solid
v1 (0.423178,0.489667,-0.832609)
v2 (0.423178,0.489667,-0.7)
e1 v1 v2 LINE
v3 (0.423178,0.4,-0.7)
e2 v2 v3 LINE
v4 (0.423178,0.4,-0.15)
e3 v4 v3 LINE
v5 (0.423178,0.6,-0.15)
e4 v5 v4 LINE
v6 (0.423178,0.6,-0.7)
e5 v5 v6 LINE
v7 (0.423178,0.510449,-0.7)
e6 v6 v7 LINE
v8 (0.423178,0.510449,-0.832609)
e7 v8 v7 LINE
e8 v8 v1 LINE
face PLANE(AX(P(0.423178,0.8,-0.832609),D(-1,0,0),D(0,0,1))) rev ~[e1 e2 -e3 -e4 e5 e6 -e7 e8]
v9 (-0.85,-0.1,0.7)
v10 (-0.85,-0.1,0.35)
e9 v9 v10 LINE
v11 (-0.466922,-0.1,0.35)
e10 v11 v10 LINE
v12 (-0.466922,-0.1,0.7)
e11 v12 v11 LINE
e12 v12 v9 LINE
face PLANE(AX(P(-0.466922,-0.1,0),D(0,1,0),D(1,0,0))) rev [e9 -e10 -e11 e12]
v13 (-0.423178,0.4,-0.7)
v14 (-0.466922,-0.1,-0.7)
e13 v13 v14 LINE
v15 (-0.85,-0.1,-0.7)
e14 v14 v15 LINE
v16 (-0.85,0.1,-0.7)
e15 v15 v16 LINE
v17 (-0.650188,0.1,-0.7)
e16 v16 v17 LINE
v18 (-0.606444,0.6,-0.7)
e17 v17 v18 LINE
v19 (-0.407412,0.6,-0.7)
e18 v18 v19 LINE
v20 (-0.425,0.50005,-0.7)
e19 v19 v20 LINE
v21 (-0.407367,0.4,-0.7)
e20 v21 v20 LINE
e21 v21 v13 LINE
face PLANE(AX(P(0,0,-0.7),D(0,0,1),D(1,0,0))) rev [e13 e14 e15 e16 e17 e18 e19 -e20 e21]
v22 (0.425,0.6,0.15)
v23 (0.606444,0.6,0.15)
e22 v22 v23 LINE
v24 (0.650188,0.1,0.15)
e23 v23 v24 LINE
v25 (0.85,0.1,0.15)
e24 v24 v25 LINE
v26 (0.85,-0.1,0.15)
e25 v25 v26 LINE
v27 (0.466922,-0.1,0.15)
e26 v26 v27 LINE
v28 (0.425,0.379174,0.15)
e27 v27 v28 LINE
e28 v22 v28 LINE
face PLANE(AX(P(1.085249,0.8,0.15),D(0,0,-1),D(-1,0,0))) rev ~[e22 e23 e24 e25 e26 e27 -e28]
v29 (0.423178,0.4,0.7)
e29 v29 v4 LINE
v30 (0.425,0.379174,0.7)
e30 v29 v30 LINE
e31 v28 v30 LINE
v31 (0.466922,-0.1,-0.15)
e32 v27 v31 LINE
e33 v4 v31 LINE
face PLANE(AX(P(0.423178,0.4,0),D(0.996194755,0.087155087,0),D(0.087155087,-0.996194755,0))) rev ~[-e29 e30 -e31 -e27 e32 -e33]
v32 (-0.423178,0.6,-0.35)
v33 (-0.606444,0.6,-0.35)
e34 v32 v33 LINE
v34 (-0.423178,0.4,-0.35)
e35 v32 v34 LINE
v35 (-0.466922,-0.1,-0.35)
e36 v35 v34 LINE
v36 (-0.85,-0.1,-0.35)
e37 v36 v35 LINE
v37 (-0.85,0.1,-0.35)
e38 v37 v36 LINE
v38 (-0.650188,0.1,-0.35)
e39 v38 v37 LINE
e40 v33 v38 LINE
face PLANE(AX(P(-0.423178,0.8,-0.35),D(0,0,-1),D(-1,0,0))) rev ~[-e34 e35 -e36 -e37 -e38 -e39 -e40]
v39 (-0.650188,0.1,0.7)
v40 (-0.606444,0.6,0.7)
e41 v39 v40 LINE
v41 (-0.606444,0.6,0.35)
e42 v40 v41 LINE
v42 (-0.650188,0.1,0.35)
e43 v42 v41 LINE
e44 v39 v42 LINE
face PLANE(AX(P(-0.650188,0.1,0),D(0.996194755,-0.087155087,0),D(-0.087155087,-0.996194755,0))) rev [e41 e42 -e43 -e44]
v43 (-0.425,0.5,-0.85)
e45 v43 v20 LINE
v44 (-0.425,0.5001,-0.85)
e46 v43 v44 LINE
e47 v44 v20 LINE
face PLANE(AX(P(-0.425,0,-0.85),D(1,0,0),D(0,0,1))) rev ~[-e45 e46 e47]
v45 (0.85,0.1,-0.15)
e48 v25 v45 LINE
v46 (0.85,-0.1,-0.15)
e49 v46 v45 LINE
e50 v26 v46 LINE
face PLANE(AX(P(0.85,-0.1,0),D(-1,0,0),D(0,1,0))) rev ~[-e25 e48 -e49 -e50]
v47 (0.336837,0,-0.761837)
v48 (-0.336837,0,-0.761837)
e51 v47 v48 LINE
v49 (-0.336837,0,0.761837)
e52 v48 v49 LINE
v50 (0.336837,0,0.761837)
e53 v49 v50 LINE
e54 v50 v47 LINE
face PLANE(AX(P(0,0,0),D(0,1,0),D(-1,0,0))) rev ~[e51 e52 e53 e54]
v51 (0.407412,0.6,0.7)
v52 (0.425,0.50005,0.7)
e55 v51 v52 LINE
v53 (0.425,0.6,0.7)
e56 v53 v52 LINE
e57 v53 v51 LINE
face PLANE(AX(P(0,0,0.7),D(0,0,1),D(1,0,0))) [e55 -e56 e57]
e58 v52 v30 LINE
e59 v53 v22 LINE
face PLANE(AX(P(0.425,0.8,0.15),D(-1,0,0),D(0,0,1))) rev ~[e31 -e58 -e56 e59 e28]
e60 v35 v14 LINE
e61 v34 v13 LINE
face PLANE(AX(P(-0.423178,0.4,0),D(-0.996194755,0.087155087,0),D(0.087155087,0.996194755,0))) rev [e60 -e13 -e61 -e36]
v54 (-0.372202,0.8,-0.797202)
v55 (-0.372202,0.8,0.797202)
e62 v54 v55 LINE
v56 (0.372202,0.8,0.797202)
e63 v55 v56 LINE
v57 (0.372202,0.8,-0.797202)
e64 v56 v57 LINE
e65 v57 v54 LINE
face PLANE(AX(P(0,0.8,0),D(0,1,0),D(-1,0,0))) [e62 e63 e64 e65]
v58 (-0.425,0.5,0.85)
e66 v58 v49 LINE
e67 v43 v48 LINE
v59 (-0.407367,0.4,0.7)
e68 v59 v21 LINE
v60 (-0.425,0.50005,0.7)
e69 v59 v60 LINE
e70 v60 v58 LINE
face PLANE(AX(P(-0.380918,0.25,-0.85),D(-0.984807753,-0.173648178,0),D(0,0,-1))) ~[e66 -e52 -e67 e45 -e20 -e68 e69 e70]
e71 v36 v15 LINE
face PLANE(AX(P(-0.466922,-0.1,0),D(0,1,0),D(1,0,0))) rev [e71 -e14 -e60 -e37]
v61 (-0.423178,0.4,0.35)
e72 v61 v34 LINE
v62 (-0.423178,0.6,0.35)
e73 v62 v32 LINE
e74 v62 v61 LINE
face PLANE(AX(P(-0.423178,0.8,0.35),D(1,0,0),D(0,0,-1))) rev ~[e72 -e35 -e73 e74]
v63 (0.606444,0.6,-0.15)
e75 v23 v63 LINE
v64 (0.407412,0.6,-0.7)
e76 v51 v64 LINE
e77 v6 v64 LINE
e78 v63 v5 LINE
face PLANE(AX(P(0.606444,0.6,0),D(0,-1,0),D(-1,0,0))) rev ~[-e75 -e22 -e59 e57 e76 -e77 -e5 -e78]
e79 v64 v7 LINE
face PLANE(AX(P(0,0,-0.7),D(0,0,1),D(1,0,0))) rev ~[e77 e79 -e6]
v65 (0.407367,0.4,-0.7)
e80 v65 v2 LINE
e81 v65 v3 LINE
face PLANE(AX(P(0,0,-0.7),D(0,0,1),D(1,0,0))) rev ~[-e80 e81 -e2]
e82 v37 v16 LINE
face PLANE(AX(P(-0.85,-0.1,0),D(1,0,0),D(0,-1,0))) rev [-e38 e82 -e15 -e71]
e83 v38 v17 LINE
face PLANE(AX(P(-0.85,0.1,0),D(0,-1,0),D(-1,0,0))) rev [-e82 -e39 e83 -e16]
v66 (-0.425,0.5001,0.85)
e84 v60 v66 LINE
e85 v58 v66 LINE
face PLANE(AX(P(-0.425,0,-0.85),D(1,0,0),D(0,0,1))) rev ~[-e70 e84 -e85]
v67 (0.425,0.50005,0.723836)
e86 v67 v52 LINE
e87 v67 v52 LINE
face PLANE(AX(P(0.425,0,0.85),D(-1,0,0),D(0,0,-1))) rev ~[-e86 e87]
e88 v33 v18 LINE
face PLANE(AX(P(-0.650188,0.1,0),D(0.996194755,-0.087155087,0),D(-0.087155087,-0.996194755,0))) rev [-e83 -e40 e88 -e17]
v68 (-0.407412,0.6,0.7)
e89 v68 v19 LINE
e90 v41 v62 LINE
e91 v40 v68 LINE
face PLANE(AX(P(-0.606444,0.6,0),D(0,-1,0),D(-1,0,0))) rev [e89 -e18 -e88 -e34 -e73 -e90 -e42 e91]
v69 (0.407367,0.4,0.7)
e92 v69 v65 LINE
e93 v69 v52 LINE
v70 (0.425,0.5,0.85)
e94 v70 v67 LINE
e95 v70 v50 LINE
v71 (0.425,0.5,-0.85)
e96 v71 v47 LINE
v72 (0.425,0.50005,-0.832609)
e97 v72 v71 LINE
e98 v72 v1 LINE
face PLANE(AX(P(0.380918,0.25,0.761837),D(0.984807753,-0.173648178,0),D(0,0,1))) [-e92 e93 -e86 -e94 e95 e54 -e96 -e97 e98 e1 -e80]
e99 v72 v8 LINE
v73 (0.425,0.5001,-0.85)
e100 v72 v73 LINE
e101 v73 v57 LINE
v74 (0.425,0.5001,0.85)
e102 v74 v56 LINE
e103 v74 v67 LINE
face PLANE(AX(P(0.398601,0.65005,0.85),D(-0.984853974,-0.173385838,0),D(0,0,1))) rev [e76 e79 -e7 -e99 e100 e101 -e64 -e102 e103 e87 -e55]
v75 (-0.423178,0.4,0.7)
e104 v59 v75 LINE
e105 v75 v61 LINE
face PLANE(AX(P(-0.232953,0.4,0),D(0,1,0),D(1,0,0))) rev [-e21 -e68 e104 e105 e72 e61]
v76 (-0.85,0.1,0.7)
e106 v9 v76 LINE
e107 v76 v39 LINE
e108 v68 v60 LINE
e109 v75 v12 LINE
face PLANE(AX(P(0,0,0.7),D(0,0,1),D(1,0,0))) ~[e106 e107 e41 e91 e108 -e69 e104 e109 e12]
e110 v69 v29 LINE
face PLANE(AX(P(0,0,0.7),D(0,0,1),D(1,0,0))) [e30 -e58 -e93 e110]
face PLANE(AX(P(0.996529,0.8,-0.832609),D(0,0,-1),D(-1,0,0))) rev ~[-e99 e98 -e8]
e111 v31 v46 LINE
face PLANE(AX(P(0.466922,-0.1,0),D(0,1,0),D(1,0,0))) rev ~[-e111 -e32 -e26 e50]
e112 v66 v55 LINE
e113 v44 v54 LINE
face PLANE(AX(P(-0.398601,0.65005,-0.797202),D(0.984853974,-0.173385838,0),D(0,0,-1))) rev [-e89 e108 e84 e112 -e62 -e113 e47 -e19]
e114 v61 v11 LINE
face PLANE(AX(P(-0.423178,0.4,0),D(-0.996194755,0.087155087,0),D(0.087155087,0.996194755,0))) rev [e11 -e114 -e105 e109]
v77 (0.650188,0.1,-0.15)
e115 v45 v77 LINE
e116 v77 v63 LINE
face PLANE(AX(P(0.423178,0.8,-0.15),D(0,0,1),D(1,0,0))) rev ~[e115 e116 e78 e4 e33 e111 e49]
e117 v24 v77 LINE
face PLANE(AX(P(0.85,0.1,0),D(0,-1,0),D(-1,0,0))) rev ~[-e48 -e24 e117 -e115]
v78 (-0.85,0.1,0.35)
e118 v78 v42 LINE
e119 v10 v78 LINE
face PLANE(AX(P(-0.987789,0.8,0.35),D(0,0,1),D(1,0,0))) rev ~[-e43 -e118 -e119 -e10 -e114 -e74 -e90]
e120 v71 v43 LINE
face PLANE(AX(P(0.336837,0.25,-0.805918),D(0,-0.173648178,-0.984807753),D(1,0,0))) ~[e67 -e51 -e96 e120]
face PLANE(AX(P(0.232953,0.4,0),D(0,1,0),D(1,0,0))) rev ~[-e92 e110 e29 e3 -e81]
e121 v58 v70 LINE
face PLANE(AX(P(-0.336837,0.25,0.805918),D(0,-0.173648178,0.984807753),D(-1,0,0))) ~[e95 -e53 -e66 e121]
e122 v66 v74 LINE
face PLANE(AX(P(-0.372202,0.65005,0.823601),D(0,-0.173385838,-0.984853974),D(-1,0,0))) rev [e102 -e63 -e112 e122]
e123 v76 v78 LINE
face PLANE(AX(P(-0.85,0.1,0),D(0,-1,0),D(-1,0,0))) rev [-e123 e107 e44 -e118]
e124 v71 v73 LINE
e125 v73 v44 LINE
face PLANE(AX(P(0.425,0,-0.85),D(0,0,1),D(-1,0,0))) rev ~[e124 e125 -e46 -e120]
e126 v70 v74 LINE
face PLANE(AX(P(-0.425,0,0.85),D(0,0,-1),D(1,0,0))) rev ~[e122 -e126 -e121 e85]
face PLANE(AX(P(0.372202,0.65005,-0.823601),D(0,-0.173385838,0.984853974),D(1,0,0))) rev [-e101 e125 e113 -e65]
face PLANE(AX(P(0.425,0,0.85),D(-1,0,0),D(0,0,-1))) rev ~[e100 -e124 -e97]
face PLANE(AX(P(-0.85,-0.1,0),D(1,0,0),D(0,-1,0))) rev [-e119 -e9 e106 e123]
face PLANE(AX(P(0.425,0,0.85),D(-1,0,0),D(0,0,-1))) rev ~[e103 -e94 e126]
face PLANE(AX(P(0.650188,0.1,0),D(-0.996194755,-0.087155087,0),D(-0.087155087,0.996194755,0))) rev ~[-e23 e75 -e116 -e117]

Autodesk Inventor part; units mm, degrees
ref_plane "YZ Plane" through (0, 0, 0) normal (1, 0, 0) x (0, 1, 0)
ref_plane "XZ Plane" through (0, 0, 0) normal (0, 1, 0) x (-1, 0, 0)
ref_plane "XY Plane" through (0, 0, 0) normal (0, 0, 1) x (1, 0, 0)
sketch "Sketch1" plane through (0, 0, 0) normal (0, 1, 0) x (-1, 0, 0)
  line L0 (0.425, 0.85) -> (-0.425, 0.85)
  line L1 (-0.425, 0.85) -> (-0.425, -0.85)
  line L2 (-0.425, -0.85) -> (0.425, -0.85)
  line L3 (0.425, -0.85) -> (0.425, 0.85)
  point P0 (0, 0)
  dimension "d0" = 1.7
  dimension "d1" = 0.85
  dimension "d2" = 0.85
  dimension "d3" = 0.425
extrude "Extrusion1" add sketch "Sketch1" along normal blind 0.8
chamfer "Chamfer1" distance 0.5 angle 10 1 edges at (-0.425, 0, 0) measured on face at (-0.425, 0.2667, -0.2833)
chamfer "Chamfer2" distance 0.5 angle 10 1 edges at (0.0441, 0, 0.85) measured on face at (0.1417, 0.4333, 0.85)
chamfer "Chamfer3" distance 0.5 angle 10 1 edges at (0.425, 0, -0.0441) measured on face at (0.425, 0.4333, -0.2833)
chamfer "Chamfer4" distance 0.5 angle 10 1 edges at (0, 0, -0.85) measured on face at (-0.1123, 0.3333, -0.85)
chamfer "Chamfer5" distance 0.3 angle 10 1 edges at (0.425, 0.8, 0) measured on face at (0.425, 0.7, -0.2833)
chamfer "Chamfer6" distance 0.3 angle 10 1 edges at (-0.0264, 0.8, -0.85) measured on face at (0.1241, 0.6, -0.85)
chamfer "Chamfer7" distance 0.3 angle 10 1 edges at (-0.425, 0.8, 0.0264) measured on face at (-0.425, 0.6, -0.2657)
chamfer "Chamfer8" distance 0.3 angle 10 1 edges at (0, 0.8, 0.85) measured on face at (-0.1241, 0.6001, 0.85)
sketch "Sketch2" plane through (0, 0, 0) normal (0, 0, 1) x (1, 0, 0)
  line L0 (0.232953, 0.6) -> (0.232953, 0.4)
  line L1 (0.232953, 0.4) -> (0.423178, 0.4)
  line L2 (0.423178, 0.4) -> (0.466922, -0.1)
  line L3 (0.466922, -0.1) -> (0.85, -0.1)
  line L4 (0.85, -0.1) -> (0.85, 0.1)
  line L5 (0.85, 0.1) -> (0.650188, 0.1)
  line L6 (0.650188, 0.1) -> (0.606444, 0.6)
  line L7 (0.606444, 0.6) -> (0.232953, 0.6)
  line L8 (0.425, 0.5) -> (-0.425, 0.5)
  line L9 (0, 0) -> (0, -0.071108)
  line L10 (-0.336837, 0) -> (0.336837, 0)
  dimension "d30" = 0.2
  dimension "d31" = 0.2
  dimension "d32" = 0.1
  dimension "d33" = 0.85
  dimension "d34" = 0.2
  dimension "d35" = 0.1
  dimension "d36" = 85
extrude "Extrusion2" add sketch "Sketch2" along normal mid plane 1.4
mirror "Mirror1" about plane through (0, 0, 0) normal (1, 0, 0) of "Extrusion2"
sketch "Sketch3" plane through (0, 0.8, 0) normal (0, 1, 0) x (1, 0, 0)
  line L0 (-0.423178, 0.7) -> (-0.423178, -0.7)
  line L1 (-0.987789, -0.35) -> (-0.423178, -0.35)
  line L2 (-0.423178, -0.35) -> (-0.423178, 0.35)
  line L3 (-0.423178, 0.35) -> (-0.987789, 0.35)
  line L4 (-0.987789, 0.35) -> (-0.987789, -0.35)
  line L5 (0.423178, 0.7) -> (0.423178, -0.7)
  line L6 (0.996529, 0.832609) -> (0.423178, 0.832609)
  line L7 (0.423178, 0.832609) -> (0.423178, 0.15)
  line L8 (0.423178, 0.15) -> (0.996529, 0.15)
  line L9 (0.996529, 0.15) -> (0.996529, 0.832609)
  line L10 (0.425, -0.7) -> (0.425, -0.85)
  line L11 (1.085249, -0.15) -> (0.425, -0.15)
  line L12 (0.425, -0.15) -> (0.425, -0.723836)
  line L13 (0.425, -0.723836) -> (1.085249, -0.723836)
  line L14 (1.085249, -0.723836) -> (1.085249, -0.15)
  point P0 (0, 0)
  dimension "d39" = 0.3
  dimension "d40" = 0.15
  dimension "d41" = 0.7
  dimension "d42" = 0.35
sketch "Sketch3 outline for Extrusion3" plane through (0, 0.8, 0) normal (0, 1, 0) x (1, 0, 0)
  line L0 (1.085249, -0.723836) -> (1.085249, -0.15)
  line L1 (0.425, -0.723836) -> (1.085249, -0.723836)
  line L2 (0.425, -0.15) -> (0.425, -0.723836)
  line L3 (1.085249, -0.15) -> (0.425, -0.15)
  line L4 (0.996529, 0.15) -> (0.996529, 0.832609)
  line L5 (0.423178, 0.15) -> (0.996529, 0.15)
  line L6 (0.423178, 0.832609) -> (0.423178, 0.15)
  line L7 (0.996529, 0.832609) -> (0.423178, 0.832609)
  line L8 (-0.987789, 0.35) -> (-0.987789, -0.35)
  line L9 (-0.423178, 0.35) -> (-0.987789, 0.35)
  line L10 (-0.423178, -0.35) -> (-0.423178, 0.35)
  line L11 (-0.987789, -0.35) -> (-0.423178, -0.35)
extrude "Extrusion3" cut sketch "Sketch3 outline for Extrusion3" against normal blind 1.4
properties part number "SOT523"
